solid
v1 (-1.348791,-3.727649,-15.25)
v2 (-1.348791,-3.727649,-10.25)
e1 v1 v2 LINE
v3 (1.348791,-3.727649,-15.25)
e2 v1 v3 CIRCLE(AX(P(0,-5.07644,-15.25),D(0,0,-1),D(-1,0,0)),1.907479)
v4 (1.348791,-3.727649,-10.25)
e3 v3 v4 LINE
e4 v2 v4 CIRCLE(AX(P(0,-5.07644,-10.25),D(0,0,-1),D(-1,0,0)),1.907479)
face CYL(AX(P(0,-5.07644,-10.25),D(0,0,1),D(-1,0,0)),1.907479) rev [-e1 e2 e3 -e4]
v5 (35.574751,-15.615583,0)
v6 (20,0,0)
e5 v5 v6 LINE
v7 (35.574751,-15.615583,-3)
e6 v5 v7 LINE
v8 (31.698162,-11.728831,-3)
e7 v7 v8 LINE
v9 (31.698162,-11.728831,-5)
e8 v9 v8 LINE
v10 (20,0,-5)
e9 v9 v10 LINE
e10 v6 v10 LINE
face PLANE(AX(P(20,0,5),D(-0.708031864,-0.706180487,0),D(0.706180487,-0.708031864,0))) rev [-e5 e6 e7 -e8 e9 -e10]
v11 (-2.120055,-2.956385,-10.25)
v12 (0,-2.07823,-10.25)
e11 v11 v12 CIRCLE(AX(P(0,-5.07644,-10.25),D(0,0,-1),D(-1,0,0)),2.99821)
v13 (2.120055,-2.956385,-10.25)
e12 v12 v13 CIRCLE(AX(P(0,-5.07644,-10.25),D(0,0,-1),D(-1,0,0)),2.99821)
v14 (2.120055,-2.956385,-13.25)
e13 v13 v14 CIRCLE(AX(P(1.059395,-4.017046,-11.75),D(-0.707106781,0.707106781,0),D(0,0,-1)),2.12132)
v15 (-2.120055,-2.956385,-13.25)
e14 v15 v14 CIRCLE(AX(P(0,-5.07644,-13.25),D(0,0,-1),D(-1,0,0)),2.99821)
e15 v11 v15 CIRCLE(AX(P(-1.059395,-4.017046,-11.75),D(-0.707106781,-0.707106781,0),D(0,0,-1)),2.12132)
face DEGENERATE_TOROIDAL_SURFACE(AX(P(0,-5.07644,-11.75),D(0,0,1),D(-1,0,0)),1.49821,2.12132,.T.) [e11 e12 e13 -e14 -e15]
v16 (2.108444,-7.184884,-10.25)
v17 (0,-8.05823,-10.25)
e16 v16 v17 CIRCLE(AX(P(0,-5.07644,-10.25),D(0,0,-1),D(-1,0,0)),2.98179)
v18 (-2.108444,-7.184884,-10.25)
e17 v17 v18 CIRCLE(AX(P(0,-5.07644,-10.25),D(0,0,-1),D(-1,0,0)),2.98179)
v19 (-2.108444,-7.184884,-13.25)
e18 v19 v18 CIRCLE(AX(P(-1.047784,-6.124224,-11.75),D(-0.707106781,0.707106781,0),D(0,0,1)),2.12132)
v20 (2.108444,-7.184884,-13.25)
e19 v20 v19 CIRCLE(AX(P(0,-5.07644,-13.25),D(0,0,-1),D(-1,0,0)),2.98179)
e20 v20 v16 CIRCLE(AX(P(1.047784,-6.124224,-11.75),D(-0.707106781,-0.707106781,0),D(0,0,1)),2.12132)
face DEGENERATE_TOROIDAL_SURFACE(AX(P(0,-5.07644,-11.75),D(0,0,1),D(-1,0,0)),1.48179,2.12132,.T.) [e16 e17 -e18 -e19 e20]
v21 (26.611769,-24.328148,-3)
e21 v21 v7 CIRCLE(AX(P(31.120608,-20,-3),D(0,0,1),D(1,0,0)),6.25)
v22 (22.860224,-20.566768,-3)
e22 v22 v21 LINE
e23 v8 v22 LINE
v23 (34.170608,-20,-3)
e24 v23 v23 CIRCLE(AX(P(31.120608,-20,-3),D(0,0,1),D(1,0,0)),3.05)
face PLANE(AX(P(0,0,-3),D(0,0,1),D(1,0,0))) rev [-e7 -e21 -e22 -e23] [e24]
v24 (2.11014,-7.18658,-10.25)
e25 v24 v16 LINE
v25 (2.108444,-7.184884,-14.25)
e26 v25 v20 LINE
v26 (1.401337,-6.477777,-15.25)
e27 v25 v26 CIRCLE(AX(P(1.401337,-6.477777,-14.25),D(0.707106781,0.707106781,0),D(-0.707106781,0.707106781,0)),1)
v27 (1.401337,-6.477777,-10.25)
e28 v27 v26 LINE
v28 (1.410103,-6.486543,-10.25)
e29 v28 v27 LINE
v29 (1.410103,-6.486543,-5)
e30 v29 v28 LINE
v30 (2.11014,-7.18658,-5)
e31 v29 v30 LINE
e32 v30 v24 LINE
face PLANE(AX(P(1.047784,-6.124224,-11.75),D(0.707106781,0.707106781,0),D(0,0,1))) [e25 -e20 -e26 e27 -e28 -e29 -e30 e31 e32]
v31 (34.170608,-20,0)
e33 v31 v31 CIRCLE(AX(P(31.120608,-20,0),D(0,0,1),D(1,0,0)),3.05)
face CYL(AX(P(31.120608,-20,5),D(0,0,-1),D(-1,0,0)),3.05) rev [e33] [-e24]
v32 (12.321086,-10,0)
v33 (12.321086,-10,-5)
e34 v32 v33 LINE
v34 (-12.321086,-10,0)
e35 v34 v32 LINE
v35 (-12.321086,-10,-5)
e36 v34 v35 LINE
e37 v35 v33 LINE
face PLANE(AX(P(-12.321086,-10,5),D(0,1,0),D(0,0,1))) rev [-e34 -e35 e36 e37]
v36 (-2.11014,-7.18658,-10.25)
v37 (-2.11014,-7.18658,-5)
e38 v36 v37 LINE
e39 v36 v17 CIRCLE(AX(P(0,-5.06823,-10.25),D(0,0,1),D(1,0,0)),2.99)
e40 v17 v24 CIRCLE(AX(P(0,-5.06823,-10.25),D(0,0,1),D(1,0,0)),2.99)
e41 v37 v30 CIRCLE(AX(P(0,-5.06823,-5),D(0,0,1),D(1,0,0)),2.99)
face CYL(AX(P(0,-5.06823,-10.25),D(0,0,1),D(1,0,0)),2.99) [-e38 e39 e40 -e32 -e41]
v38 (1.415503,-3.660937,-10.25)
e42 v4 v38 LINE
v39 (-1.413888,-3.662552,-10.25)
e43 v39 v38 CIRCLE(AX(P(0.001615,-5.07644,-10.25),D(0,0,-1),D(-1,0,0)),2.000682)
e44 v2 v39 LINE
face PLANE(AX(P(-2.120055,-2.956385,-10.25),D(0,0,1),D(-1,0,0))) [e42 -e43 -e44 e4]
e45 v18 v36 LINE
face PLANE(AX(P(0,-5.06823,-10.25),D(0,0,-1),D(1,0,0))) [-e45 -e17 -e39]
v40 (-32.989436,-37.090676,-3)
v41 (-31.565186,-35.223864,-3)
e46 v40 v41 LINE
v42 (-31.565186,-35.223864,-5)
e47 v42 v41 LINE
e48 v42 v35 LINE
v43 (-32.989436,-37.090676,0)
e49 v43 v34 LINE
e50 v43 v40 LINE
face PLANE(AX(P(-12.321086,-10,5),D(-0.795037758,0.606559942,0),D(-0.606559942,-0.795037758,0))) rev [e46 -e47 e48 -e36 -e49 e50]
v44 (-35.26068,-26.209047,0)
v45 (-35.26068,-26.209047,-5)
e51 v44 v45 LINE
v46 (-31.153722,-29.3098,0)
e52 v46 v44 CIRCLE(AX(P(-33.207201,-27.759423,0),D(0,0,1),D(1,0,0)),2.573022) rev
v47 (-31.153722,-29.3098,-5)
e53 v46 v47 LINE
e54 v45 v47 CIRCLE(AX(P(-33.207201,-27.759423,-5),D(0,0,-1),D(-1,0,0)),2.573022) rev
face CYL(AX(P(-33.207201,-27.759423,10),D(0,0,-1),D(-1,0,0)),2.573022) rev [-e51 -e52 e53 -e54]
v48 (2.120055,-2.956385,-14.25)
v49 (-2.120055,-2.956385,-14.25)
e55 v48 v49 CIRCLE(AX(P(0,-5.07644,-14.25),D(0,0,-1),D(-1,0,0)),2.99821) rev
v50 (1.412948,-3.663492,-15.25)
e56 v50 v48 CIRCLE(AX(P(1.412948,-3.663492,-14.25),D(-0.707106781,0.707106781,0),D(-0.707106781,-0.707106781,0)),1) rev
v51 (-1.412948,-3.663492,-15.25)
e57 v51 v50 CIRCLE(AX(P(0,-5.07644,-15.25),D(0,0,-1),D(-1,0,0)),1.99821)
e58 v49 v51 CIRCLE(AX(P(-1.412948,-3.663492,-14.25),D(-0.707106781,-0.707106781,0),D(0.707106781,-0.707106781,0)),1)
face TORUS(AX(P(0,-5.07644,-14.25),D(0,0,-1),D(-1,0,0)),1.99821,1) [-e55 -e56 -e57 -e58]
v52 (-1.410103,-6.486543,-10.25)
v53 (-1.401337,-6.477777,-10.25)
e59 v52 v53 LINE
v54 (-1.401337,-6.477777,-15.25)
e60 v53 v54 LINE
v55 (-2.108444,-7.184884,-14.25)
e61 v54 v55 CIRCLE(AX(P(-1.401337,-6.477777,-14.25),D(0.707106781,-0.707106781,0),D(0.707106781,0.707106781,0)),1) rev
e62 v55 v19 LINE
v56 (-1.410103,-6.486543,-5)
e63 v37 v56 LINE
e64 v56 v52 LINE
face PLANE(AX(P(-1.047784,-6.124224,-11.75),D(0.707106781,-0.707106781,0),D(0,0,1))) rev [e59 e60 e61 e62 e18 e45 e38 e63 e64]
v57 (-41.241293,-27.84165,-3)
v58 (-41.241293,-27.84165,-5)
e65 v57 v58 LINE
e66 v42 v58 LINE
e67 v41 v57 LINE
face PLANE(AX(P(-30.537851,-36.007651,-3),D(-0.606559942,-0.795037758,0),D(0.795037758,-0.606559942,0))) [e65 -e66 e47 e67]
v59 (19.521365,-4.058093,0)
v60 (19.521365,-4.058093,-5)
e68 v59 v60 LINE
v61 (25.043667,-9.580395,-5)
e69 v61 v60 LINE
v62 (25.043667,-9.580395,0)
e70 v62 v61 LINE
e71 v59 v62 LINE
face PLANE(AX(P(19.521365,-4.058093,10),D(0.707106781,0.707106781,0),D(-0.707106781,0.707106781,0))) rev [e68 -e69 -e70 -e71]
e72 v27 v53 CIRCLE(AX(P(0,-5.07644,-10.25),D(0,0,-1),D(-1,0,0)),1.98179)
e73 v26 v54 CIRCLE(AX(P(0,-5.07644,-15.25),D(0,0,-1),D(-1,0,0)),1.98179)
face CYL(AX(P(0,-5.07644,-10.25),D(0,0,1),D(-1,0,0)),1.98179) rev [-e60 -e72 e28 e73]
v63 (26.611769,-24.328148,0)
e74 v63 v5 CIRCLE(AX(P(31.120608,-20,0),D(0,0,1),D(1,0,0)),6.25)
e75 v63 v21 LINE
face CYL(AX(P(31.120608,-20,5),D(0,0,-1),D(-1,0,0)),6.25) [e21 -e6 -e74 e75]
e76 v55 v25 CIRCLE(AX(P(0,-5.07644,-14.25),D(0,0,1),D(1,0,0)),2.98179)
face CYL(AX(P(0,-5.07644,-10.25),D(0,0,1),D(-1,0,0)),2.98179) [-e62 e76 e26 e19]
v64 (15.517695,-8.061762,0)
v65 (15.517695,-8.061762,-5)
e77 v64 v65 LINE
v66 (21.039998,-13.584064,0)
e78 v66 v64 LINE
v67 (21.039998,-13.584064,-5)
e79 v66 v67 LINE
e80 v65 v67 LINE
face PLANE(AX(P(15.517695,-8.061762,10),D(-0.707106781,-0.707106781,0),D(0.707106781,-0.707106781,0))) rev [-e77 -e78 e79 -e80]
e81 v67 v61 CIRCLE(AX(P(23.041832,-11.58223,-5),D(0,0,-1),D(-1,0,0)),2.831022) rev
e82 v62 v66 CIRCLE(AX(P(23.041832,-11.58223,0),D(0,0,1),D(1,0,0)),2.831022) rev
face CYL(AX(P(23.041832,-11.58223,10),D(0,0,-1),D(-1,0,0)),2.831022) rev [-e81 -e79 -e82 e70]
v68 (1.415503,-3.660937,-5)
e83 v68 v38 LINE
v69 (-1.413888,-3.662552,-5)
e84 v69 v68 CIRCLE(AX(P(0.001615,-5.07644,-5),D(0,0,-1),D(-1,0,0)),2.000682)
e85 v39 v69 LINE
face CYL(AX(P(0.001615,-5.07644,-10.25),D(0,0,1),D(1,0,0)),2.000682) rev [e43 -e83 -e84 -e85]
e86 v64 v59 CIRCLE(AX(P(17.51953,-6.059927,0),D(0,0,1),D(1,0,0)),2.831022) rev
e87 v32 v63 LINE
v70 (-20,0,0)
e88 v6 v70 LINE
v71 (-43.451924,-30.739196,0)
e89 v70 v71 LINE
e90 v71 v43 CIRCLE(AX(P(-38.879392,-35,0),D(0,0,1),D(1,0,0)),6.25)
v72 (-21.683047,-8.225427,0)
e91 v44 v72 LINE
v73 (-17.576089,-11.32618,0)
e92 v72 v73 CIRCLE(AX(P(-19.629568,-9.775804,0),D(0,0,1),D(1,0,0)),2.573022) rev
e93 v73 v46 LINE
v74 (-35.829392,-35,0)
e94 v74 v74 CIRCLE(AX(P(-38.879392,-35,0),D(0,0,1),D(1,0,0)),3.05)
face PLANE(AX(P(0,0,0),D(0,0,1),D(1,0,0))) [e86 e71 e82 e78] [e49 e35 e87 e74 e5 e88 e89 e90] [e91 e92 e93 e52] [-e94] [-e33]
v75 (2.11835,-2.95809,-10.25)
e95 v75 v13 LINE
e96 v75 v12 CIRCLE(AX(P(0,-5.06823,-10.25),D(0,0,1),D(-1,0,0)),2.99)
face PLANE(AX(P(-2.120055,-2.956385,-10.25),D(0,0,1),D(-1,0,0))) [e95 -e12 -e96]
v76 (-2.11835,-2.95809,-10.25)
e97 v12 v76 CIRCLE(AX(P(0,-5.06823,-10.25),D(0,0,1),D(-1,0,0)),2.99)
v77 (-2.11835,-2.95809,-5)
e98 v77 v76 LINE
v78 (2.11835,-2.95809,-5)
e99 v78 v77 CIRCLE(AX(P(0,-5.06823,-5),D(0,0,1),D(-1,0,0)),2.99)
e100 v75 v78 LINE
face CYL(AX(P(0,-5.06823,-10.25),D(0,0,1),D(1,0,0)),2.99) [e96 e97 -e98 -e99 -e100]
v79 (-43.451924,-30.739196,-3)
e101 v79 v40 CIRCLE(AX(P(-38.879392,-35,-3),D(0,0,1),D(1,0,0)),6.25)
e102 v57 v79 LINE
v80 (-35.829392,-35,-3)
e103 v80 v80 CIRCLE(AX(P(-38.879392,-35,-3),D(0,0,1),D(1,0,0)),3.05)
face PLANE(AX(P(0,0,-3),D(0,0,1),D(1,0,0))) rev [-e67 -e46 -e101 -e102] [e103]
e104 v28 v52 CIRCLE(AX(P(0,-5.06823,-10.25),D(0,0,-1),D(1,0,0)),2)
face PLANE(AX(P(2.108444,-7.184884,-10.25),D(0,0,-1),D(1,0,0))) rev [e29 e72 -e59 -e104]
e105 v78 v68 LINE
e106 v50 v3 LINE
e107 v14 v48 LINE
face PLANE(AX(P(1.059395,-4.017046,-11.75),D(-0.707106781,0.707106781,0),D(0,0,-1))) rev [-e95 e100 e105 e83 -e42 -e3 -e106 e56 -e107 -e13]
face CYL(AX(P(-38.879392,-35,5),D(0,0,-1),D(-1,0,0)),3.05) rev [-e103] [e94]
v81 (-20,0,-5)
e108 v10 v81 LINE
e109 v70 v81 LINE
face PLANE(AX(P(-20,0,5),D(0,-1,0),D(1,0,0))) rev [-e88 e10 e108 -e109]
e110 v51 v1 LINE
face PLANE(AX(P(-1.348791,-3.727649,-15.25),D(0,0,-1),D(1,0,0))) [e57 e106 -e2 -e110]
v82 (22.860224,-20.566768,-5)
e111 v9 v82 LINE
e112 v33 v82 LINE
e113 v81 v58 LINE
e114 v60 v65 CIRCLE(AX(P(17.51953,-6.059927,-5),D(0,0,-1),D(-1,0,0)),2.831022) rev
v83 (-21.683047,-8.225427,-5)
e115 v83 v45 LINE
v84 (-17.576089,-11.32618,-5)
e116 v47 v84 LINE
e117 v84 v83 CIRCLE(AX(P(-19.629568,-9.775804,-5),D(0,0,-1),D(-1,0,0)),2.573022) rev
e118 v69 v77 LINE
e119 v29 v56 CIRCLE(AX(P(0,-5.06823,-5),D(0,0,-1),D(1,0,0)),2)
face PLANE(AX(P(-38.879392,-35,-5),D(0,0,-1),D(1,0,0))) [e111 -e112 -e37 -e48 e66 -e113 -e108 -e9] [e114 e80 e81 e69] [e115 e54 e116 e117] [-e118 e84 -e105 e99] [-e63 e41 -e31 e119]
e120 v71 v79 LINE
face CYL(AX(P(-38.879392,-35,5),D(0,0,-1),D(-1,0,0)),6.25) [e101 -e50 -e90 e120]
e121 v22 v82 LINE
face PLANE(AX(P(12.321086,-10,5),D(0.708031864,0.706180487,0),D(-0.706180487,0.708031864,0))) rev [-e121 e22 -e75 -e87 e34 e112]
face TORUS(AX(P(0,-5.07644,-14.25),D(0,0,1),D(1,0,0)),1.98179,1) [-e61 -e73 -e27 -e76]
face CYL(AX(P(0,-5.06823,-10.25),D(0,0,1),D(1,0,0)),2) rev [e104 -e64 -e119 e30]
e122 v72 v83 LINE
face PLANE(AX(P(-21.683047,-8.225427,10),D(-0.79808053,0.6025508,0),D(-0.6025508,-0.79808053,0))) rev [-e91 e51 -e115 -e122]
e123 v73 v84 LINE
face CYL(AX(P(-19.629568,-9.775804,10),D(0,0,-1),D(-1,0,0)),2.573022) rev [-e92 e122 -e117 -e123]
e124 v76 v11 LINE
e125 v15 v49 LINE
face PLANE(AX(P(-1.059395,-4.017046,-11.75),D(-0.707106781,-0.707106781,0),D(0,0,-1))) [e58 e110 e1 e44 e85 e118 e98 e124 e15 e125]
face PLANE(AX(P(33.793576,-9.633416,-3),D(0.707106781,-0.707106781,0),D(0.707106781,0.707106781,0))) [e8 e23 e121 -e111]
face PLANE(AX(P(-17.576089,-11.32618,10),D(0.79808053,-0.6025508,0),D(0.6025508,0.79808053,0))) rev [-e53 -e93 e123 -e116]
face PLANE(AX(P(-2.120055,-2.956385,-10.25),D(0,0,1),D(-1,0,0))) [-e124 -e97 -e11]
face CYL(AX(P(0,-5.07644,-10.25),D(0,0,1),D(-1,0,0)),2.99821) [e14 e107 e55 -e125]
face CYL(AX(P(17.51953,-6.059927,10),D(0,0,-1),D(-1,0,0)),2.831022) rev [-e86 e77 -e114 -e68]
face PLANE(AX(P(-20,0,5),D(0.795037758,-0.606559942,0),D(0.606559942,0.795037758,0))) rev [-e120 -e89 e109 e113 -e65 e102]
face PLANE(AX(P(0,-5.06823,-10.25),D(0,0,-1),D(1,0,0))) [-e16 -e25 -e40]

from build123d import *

# Parameters (mm, degrees)
SZKIC1_R                    = 3.05
DODANIE_WYCI_GNI_CIE1_DEPTH = 5
WYTNIJ_WYCI_GNI_CIE2_DEPTH  = 10
WYTNIJ_WYCI_GNI_CIE4_DEPTH  = 10
DODANIE_WYCI_GNI_CIE2_DEPTH = 5.25
OBR_T1_ANGLE                = 90
OBR_T2_ANGLE                = 90
SZKIC8_W                    = 100.07426583
SZKIC8_H                    = 50.963746487
WYTNIJ_WYCI_GNI_CIE5_DEPTH  = 23
WYTNIJ_WYCI_GNI_CIE6_DEPTH  = 2
WYTNIJ_WYCI_GNI_CIE7_DEPTH  = 2
WYTNIJ_WYCI_GNI_CIE9_DEPTH  = 5.25
ZAOKR_GLENIE2_R             = 1


# Read off the part's stored shape, not the designer's step: Obrót1, Obrót2
with BuildPart() as part:
    # Szkic1 → Dodanie-wyciągnięcie1 (new body)
    with BuildSketch(Plane.XY):
        with BuildLine():
            Line((-20, 0), (20, 0))
            Line((20, 0), (35.574751144, -15.6155831))
            ThreePointArc((35.574751144, -15.6155831), (35.476976606, -24.481579544), (26.61176868, -24.328148016))
            Line((26.61176868, -24.328148016), (12.321086207, -10))
            Line((12.321086207, -10), (-12.321086207, -10))
            Line((-12.321086207, -10), (-32.989436275, -37.090675759))
            ThreePointArc((-32.989436275, -37.090675759), (-42.12272692, -40.342590816), (-43.451924108, -30.739196396))
            Line((-43.451924108, -30.739196396), (-20, 0))
        make_face()
        with Locations((-38.879391697, -35)):
            Circle(SZKIC1_R, mode=Mode.SUBTRACT)
        with Locations((31.120608303, -20)):
            Circle(SZKIC1_R, mode=Mode.SUBTRACT)
    dodanie_wyci_gni_cie1 = extrude(amount=DODANIE_WYCI_GNI_CIE1_DEPTH)

    # Szkic3 → Wytnij-wyciągnięcie2 (cut)
    with BuildSketch(Plane(origin=(0, 0, 0), x_dir=(-1, 0, 0), z_dir=(0, 0, -1))):
        with BuildLine():
            Line((21.683047095, -8.225427037), (35.260679995, -26.209046772))
            ThreePointArc((35.260679995, -26.209046772), (34.75757763, -29.812902485), (31.153721917, -29.309800121))
            Line((31.153721917, -29.309800121), (17.576089017, -11.326180386))
            ThreePointArc((17.576089017, -11.326180386), (18.079191382, -7.722324673), (21.683047095, -8.225427037))
        make_face()
    wytnij_wyci_gni_cie2 = extrude(amount=-WYTNIJ_WYCI_GNI_CIE2_DEPTH, mode=Mode.SUBTRACT)

    # Szkic4 → Wytnij-wyciągnięcie4 (cut)
    with BuildSketch(Plane(origin=(0, 0, 0), x_dir=(-1, 0, 0), z_dir=(0, 0, -1))):
        with BuildLine():
            Line((-15.517695436, -8.06176207), (-21.039997823, -13.584064457))
            ThreePointArc((-21.039997823, -13.584064457), (-25.043667053, -13.584064457), (-25.043667053, -9.580395227))
            Line((-25.043667053, -9.580395227), (-19.521364667, -4.05809284))
            ThreePointArc((-19.521364667, -4.05809284), (-15.517695436, -4.05809284), (-15.517695436, -8.06176207))
        make_face()
    wytnij_wyci_gni_cie4 = extrude(amount=-WYTNIJ_WYCI_GNI_CIE4_DEPTH, mode=Mode.SUBTRACT)

    # Szkic5 → Dodanie-wyciągnięcie2 (add)
    with BuildSketch(Plane.XY.offset(5)):
        with BuildLine():
            Line((-1.922496946, -4.528242282), (-2.878604971, -4.259692233))
            ThreePointArc((-2.878604971, -4.259692233), (0, -2.078230062), (2.878604971, -4.259692233))
            Line((2.878604971, -4.259692233), (1.925488275, -4.527402083))
            ThreePointArc((1.925488275, -4.527402083), (0.001178609, -3.075757991), (-1.922496946, -4.528242282))
        make_face()
        with BuildLine():
            Line((-1.925488275, -5.609058042), (-2.878604971, -5.876767892))
            ThreePointArc((-2.878604971, -5.876767892), (0, -8.058230062), (2.878604971, -5.876767892))
            Line((2.878604971, -5.876767892), (1.925488275, -5.609058042))
            ThreePointArc((1.925488275, -5.609058042), (0, -7.068230062), (-1.925488275, -5.609058042))
        make_face()
    dodanie_wyci_gni_cie2 = extrude(amount=DODANIE_WYCI_GNI_CIE2_DEPTH)

    # Obrót1 outline → Obrót1 (revolve)
    with BuildSketch(Plane(origin=(0, -5.076440198, 0), x_dir=(0.7071067811865502, 0.7071067811865448, 0), z_dir=(0.7071067811865448, -0.7071067811865502, 0))):
        with BuildLine():
            ThreePointArc((2.998210136, 10.25), (3.619530479, 11.75), (2.998210136, 13.25))
            Line((2.998210136, 13.25), (2.998210136, 15.25))
            Line((2.998210136, 15.25), (1.907479051, 15.25))
            Line((1.907479051, 15.25), (1.907479051, 10.25))
            Line((1.907479051, 10.25), (2.998210136, 10.25))
        make_face()
    obr_t1 = revolve(axis=Axis((0, -5.076440198, 0), (0, 0, 1)), revolution_arc=OBR_T1_ANGLE)

    # Obrót2 outline → Obrót2 (revolve)
    with BuildSketch(Plane(origin=(0, -5.076440198, 0), x_dir=(-0.7071067811865493, -0.7071067811865457, 0), z_dir=(-0.7071067811865457, 0.7071067811865493, 0))):
        with BuildLine():
            Line((1.981789864, 15.25), (1.981789864, 10.25))
            Line((1.981789864, 10.25), (2.981789864, 10.25))
            ThreePointArc((2.981789864, 10.25), (3.603110208, 11.75), (2.981789864, 13.25))
            Line((2.981789864, 13.25), (2.981789864, 15.25))
            Line((2.981789864, 15.25), (1.981789864, 15.25))
        make_face()
    obr_t2 = revolve(axis=Axis((0, -5.076440198, 0), (0, 0, 1)), revolution_arc=OBR_T2_ANGLE)

    # Lustro4: Dodanie-wyciągnięcie1, Wytnij-wyciągnięcie2, Wytnij-wyciągnięcie4, Dodanie-wyciągnięcie2, Obrót1, Obrót2 across plane
    add(dodanie_wyci_gni_cie1.mirror(Plane(origin=(-38.879391697, -35, 0), x_dir=(1, 0, 0), z_dir=(0, 0, 1))))
    add(wytnij_wyci_gni_cie2.mirror(Plane(origin=(-38.879391697, -35, 0), x_dir=(1, 0, 0), z_dir=(0, 0, 1))), mode=Mode.SUBTRACT)
    add(wytnij_wyci_gni_cie4.mirror(Plane(origin=(-38.879391697, -35, 0), x_dir=(1, 0, 0), z_dir=(0, 0, 1))), mode=Mode.SUBTRACT)
    add(dodanie_wyci_gni_cie2.mirror(Plane(origin=(-38.879391697, -35, 0), x_dir=(1, 0, 0), z_dir=(0, 0, 1))))
    add(obr_t1.mirror(Plane(origin=(-38.879391697, -35, 0), x_dir=(1, 0, 0), z_dir=(0, 0, 1))))
    add(obr_t2.mirror(Plane(origin=(-38.879391697, -35, 0), x_dir=(1, 0, 0), z_dir=(0, 0, 1))))

    # Szkic8 → Wytnij-wyciągnięcie5 (cut)
    with BuildSketch(Plane.XY):
        with Locations((-3.506949348, -18.717463345)):
            Rectangle(SZKIC8_W, SZKIC8_H)
    extrude(amount=WYTNIJ_WYCI_GNI_CIE5_DEPTH, mode=Mode.SUBTRACT)

    # Szkic9 → Wytnij-wyciągnięcie6 (cut)
    with BuildSketch(Plane.XY.offset(-5)):
        Polygon((33.793576108, -9.633416266), (20.924371092, -22.502621281), (34.229820345, -35.808070534), (47.099025361, -22.938865519), align=None)
    extrude(amount=WYTNIJ_WYCI_GNI_CIE6_DEPTH, mode=Mode.SUBTRACT)

    # Szkic10 → Wytnij-wyciągnięcie7 (cut)
    with BuildSketch(Plane.XY.offset(-5)):
        Polygon((-30.537850877, -36.007651395), (-42.082921385, -27.199544837), (-48.802909893, -36.007651395), (-37.257839386, -44.815757953), align=None)
    extrude(amount=WYTNIJ_WYCI_GNI_CIE7_DEPTH, mode=Mode.SUBTRACT)

    # Szkic14 → Wytnij-wyciągnięcie9 (cut)
    with BuildSketch(Plane(origin=(0, 0, -10.25), x_dir=(-1, 0, 0), z_dir=(0, 0, -1))):
        with BuildLine():
            Line((-2.559394547, -2.517045651), (-1.348791372, -3.727648826))
            Line((-1.348791372, -3.727648826), (1.348791372, -3.727648826))
            Line((1.348791372, -3.727648826), (2.559394547, -2.517045651))
            ThreePointArc((2.559394547, -2.517045651), (3.408337444, -5.072577978), (2.547783661, -7.624223859))
            Line((2.547783661, -7.624223859), (1.410102537, -6.486542735))
            Line((1.410102537, -6.486542735), (-1.410102537, -6.486542735))
            Line((-1.410102537, -6.486542735), (-2.547783661, -7.624223859))
            ThreePointArc((-2.547783661, -7.624223859), (-3.611320344, -5.073039448), (-2.559394547, -2.517045651))
        make_face()
    extrude(amount=-WYTNIJ_WYCI_GNI_CIE9_DEPTH, mode=Mode.SUBTRACT)

    # Zaokrąglenie2
    zaokr_glenie2_edges = [part.edges().sort_by_distance(p)[0] for p in [
        (0, -2.078230062, -15.25),
        (0, -8.058230062, -15.25),
    ]]
    fillet(zaokr_glenie2_edges, radius=ZAOKR_GLENIE2_R - 0.0001)  # a hair under: the kernel refuses the full size


solid = part.part
